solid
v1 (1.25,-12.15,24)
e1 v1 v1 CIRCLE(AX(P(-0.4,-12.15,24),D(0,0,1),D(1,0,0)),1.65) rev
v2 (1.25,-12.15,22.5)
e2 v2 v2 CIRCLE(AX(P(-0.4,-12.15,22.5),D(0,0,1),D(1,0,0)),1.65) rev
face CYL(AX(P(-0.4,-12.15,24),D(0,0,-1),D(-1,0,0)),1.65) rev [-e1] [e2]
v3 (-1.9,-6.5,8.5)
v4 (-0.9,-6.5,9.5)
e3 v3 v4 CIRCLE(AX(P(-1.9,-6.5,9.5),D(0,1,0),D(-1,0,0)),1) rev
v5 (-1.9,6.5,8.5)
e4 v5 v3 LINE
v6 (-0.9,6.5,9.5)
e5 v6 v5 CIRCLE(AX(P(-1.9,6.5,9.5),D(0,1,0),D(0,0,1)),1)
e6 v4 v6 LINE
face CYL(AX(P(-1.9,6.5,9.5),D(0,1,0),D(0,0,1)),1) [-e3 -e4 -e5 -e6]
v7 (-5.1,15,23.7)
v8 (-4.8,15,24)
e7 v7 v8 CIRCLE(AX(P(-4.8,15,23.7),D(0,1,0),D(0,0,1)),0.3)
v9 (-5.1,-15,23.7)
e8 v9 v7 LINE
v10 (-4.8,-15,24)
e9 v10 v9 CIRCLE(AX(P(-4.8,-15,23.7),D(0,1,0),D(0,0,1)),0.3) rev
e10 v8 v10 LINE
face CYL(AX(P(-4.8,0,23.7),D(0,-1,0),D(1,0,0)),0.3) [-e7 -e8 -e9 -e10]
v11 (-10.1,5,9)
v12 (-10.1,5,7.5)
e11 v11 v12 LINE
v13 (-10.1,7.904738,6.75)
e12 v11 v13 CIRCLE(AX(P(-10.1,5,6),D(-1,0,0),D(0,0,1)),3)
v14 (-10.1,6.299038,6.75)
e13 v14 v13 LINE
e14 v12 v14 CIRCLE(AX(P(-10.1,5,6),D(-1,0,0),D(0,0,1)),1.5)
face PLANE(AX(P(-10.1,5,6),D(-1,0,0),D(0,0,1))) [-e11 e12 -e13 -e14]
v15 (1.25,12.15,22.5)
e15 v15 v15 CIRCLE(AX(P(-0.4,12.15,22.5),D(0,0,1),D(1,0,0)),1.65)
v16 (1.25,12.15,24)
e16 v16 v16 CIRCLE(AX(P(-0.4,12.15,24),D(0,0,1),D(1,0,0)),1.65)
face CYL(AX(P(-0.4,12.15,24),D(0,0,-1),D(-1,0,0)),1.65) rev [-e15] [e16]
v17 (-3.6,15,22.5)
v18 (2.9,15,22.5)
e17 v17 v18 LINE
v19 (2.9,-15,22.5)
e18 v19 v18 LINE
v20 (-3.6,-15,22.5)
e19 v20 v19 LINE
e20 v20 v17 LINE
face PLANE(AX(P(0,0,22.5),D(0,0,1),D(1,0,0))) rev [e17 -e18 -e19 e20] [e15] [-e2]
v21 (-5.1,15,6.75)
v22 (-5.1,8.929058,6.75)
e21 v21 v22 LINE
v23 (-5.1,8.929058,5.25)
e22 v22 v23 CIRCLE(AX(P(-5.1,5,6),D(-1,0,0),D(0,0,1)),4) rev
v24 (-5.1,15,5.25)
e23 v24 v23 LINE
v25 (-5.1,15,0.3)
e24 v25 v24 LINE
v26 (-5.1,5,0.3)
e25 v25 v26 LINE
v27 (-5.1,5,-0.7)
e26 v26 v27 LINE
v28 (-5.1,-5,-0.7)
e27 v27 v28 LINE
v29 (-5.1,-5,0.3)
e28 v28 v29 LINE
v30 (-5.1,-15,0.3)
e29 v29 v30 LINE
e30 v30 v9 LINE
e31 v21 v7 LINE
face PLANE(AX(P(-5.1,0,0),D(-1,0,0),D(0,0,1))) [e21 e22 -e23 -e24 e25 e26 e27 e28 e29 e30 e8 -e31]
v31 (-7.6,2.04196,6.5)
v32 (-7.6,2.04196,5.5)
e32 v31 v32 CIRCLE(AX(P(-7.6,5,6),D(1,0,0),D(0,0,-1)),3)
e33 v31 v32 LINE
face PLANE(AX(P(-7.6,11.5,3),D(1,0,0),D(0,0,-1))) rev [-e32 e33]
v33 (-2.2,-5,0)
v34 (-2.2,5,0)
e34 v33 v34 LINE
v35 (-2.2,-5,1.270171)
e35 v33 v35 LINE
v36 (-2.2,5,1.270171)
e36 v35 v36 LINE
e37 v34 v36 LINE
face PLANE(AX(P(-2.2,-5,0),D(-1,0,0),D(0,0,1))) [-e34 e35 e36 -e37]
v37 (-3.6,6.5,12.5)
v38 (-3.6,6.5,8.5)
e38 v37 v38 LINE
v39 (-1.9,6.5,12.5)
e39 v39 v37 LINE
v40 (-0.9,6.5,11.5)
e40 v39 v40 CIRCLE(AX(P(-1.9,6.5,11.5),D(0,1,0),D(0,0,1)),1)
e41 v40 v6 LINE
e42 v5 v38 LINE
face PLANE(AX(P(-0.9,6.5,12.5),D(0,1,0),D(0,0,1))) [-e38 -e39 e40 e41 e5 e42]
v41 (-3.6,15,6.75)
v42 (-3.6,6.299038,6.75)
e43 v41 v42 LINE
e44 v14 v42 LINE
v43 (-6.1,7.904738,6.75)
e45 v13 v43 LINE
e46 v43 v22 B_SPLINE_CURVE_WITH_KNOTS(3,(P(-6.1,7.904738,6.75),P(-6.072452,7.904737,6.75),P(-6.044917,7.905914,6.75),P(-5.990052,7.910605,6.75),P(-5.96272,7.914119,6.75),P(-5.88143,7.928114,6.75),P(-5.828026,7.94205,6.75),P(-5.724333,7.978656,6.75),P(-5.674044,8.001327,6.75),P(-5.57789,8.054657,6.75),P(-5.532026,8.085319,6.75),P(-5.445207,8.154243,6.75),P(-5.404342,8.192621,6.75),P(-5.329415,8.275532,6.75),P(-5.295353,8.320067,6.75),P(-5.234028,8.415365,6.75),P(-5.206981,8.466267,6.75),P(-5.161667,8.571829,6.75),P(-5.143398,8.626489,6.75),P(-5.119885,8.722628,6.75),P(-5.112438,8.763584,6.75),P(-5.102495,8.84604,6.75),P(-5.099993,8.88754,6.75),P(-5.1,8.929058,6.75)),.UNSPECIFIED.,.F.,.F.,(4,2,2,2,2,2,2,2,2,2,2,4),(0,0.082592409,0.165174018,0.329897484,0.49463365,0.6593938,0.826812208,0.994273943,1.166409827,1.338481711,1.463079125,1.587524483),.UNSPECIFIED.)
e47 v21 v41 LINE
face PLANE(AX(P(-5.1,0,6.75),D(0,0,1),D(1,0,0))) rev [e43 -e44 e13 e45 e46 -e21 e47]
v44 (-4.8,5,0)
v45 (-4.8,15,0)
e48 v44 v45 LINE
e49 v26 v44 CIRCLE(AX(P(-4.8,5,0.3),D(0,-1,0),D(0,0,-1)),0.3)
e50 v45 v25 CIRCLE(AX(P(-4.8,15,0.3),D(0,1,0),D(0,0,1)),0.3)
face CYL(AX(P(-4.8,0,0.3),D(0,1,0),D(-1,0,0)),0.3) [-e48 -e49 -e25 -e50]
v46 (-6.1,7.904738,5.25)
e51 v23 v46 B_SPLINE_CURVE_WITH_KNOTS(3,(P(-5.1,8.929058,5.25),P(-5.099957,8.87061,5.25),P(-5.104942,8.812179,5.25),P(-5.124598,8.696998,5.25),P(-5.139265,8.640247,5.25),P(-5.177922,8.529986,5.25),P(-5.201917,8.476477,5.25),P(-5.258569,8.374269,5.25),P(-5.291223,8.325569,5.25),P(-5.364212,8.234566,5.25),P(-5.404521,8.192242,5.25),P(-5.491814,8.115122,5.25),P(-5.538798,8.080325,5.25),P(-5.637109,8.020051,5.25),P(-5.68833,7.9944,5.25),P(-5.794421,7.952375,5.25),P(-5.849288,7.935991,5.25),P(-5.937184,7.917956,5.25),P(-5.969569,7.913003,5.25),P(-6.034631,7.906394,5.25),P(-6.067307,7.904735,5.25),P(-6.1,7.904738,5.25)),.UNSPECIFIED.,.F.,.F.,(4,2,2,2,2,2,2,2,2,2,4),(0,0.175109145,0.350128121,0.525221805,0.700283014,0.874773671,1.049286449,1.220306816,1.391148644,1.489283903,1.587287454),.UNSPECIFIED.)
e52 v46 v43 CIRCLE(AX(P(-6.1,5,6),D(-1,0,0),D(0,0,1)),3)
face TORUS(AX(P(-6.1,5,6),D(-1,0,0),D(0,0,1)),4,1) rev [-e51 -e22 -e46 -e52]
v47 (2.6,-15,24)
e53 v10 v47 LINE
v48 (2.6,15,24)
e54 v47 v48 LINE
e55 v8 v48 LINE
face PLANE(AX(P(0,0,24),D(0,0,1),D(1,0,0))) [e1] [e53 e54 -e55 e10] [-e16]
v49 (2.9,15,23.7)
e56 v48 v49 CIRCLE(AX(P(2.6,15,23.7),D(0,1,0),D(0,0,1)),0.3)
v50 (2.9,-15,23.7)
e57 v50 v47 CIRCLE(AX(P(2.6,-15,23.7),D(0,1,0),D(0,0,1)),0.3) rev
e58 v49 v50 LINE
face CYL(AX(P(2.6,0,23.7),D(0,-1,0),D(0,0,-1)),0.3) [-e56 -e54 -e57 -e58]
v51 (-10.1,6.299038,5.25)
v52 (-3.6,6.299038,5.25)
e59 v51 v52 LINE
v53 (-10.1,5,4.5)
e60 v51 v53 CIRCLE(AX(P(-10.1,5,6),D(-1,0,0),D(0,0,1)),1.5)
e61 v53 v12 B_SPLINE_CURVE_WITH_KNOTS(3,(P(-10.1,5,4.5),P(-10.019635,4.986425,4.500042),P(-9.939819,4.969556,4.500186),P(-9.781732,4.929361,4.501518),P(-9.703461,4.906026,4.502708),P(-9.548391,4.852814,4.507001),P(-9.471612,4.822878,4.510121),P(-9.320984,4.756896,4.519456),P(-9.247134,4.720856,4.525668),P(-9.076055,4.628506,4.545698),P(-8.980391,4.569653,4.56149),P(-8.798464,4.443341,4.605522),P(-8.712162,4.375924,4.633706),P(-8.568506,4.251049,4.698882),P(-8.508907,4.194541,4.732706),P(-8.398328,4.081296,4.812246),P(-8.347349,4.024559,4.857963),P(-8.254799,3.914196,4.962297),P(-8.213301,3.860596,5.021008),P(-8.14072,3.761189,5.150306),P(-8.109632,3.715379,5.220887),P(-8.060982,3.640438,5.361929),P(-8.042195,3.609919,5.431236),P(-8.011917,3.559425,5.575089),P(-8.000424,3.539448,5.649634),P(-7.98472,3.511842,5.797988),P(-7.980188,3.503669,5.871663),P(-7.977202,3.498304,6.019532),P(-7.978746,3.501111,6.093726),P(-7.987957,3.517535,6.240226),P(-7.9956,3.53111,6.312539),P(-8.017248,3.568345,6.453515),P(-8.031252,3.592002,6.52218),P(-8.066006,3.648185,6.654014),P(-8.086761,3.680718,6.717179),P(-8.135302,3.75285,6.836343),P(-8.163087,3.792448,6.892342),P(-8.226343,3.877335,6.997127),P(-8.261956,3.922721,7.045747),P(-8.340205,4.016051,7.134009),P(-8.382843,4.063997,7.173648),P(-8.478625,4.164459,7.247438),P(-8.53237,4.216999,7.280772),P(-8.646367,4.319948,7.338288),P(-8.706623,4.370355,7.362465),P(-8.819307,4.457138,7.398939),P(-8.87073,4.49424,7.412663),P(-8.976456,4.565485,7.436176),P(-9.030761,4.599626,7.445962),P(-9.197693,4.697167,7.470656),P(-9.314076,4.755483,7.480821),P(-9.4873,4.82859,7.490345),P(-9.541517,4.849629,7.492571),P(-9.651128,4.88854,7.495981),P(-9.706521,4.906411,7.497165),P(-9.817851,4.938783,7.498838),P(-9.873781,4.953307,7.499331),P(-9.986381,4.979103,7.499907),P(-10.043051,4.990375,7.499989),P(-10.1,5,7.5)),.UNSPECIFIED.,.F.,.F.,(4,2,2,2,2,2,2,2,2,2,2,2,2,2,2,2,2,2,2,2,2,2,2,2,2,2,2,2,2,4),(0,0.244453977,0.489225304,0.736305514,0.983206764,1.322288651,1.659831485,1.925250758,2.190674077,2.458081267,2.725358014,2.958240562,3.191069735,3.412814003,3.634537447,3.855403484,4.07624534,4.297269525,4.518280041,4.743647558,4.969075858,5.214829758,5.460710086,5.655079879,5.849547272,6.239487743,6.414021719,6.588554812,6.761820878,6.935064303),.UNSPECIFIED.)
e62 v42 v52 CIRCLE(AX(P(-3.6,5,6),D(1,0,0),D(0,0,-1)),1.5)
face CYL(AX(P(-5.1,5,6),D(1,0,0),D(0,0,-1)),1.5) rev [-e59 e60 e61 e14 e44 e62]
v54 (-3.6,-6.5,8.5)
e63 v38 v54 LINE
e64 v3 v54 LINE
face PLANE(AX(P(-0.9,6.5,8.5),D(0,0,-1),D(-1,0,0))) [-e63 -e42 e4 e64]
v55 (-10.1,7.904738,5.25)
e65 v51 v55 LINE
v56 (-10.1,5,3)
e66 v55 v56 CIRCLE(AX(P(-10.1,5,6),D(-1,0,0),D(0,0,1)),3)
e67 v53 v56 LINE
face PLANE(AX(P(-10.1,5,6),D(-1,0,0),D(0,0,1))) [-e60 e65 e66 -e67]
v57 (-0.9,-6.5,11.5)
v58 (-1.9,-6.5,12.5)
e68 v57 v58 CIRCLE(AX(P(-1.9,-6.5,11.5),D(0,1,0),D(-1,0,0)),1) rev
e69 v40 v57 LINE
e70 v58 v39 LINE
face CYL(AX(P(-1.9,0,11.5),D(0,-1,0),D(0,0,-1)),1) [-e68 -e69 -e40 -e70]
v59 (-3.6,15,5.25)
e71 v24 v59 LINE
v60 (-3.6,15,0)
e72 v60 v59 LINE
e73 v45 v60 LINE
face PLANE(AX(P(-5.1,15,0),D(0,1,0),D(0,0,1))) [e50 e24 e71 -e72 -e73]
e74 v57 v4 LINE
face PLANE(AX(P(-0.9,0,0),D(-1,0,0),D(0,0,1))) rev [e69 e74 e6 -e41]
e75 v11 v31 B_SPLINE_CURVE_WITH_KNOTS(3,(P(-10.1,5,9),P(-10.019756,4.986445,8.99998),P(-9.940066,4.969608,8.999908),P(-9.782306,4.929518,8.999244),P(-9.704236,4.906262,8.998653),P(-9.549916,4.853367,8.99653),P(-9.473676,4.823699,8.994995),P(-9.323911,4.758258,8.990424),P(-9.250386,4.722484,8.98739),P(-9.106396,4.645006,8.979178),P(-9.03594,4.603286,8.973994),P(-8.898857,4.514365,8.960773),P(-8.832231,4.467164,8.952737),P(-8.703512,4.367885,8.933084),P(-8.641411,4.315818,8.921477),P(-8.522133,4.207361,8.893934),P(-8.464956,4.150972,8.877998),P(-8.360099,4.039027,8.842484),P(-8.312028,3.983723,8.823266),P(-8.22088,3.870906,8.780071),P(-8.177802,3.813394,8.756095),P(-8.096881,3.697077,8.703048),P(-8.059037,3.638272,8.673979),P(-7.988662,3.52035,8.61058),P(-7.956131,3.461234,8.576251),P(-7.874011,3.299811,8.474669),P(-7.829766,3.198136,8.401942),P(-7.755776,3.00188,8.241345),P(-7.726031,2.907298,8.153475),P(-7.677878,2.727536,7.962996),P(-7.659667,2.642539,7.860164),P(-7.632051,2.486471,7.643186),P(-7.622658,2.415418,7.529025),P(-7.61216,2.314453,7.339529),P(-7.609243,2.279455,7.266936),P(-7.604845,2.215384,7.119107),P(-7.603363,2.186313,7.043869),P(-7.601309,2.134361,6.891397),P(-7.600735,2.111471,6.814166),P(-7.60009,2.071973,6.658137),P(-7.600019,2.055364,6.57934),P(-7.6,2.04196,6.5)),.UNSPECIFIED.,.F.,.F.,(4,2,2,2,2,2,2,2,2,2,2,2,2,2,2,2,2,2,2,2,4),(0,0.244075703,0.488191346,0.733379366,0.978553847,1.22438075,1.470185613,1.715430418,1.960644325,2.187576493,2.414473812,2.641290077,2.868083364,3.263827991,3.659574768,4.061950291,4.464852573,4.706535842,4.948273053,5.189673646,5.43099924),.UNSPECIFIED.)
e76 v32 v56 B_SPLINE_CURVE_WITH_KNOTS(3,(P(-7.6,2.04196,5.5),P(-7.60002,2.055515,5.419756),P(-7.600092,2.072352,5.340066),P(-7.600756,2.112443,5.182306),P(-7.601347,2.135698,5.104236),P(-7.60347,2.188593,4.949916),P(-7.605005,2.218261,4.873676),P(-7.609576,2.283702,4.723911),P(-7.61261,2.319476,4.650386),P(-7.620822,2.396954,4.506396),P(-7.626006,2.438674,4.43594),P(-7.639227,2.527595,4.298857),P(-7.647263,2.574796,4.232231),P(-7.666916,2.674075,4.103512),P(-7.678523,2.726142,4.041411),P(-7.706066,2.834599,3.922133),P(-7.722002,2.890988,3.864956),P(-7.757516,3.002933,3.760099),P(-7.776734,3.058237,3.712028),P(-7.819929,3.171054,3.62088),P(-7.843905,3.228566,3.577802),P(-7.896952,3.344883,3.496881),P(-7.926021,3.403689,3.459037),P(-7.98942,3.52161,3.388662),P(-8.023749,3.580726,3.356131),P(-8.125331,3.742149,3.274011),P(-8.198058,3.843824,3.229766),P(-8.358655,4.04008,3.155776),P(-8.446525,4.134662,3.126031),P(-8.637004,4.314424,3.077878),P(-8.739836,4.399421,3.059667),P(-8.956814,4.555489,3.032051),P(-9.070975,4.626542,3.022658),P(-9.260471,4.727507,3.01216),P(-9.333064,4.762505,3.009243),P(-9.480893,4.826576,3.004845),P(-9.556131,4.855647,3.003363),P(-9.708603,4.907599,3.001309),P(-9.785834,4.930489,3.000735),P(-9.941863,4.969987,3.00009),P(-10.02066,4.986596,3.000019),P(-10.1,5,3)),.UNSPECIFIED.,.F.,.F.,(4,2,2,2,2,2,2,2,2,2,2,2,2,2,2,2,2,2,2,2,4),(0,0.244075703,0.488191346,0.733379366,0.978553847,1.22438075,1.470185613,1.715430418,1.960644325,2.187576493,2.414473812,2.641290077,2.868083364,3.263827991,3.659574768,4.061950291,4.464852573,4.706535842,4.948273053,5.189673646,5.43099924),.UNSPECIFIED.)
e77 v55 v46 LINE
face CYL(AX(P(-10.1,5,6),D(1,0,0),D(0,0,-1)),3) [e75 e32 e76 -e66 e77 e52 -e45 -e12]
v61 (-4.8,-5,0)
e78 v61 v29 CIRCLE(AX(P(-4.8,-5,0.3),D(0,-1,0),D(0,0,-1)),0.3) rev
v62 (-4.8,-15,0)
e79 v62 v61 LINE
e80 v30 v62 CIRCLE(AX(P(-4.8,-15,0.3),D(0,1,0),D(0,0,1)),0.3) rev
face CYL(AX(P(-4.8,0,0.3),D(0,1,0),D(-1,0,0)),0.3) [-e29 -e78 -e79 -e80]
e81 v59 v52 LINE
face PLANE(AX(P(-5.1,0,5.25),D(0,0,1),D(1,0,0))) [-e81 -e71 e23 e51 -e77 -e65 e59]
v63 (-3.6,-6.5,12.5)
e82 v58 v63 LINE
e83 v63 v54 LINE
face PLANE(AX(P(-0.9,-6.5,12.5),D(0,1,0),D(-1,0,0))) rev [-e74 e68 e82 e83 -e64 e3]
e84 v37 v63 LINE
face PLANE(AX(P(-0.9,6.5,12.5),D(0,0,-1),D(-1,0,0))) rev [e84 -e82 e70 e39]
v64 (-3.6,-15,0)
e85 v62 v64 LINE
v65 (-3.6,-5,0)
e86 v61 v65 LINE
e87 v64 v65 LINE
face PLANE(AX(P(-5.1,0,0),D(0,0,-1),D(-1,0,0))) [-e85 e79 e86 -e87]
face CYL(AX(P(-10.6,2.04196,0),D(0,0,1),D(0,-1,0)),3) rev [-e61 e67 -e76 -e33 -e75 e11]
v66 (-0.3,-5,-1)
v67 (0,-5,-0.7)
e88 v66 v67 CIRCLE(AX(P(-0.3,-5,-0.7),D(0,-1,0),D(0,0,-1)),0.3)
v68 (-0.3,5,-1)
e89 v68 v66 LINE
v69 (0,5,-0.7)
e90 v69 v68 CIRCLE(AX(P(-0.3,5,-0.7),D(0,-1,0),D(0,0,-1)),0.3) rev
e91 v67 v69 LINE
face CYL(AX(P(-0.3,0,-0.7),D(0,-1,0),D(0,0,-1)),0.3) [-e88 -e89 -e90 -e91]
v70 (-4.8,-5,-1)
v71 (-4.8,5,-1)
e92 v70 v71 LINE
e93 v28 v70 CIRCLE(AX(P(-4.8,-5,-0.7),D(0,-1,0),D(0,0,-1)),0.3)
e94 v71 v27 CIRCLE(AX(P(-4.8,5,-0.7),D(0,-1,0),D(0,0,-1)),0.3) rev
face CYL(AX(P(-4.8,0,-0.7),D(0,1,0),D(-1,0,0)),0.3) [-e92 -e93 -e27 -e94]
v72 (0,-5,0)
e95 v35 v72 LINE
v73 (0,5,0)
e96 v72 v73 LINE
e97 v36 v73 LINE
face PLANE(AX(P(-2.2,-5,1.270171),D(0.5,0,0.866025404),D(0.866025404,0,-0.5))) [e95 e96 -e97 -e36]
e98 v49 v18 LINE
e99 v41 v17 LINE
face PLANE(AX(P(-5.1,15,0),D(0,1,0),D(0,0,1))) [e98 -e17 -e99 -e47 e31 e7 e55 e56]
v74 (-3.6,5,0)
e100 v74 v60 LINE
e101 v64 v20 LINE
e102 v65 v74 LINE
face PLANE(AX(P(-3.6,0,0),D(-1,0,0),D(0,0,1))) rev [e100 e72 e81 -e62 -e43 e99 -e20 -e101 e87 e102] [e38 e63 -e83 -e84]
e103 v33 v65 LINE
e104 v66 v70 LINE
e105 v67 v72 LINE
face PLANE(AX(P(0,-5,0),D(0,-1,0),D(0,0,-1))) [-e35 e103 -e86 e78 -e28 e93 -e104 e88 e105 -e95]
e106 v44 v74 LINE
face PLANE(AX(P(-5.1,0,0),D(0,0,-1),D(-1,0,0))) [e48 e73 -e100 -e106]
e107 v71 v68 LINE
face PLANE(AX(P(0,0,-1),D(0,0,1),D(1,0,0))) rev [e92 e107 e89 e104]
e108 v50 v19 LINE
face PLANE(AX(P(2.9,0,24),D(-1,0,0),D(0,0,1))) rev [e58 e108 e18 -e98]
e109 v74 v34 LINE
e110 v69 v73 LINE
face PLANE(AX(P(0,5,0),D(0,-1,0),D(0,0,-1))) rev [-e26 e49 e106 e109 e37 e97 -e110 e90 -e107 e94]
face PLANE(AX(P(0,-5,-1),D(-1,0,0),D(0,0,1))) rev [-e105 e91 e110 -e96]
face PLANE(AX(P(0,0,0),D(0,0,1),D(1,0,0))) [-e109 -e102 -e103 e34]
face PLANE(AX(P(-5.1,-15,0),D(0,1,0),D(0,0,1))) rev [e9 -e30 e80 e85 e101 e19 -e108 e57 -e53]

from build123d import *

# Parameters (mm, degrees)
BOSS_EXTRUDE1_DEPTH      = 5
BOSS_EXTRUDE1_DEPTH_BACK = 5
SKETCH2_W                = 3.6
SKETCH2_H                = 10
BOSS_EXTRUDE2_DEPTH      = 1
SKETCH3_W                = 1
SKETCH3_H                = 10
BOSS_EXTRUDE3_DEPTH      = 1.5
SKETCH4_W                = 1.5
SKETCH4_H                = 30
SKETCH4_W_2              = 6.5
SKETCH4_R                = 1.65
BOSS_EXTRUDE4_DEPTH      = 1.5
FILLET1_R                = 0.3
SKETCH5_W                = 4
SKETCH5_H                = 13
BOSS_EXTRUDE5_DEPTH      = 2.7
CUT_EXTRUDE1_DEPTH       = 30.038767191
BOSS_EXTRUDE6_START      = -1.5
BOSS_EXTRUDE6_DEPTH      = 5
CUT_EXTRUDE2_START       = -3
SKETCH8_W                = 2.5
SKETCH8_H                = 6
CUT_EXTRUDE2_DEPTH       = 3
FILLET2_R                = 3
FILLET3_R                = 1
FILLET4_R                = 1


with BuildPart() as part:
    # Sketch1 → Boss-Extrude1 (new, two sides: drawn at the far end of the back side and taken through both)
    with BuildSketch(Plane(origin=(0, 0, 0), x_dir=(1, 0, 0), z_dir=(0, 1, 0)).offset(-BOSS_EXTRUDE1_DEPTH_BACK)):
        Polygon((0, 0), (-2.2, 0), (-2.2, -1.270170592), align=None)
    extrude(amount=BOSS_EXTRUDE1_DEPTH + BOSS_EXTRUDE1_DEPTH_BACK)

    # Sketch2 → Boss-Extrude2 (add)
    with BuildSketch(Plane(origin=(0, 0, 0), x_dir=(-1, 0, 0), z_dir=(0, 0, -1))):
        with Locations((1.8, 0)):
            Rectangle(SKETCH2_W, SKETCH2_H)
    extrude(amount=BOSS_EXTRUDE2_DEPTH)

    # Sketch3 → Boss-Extrude3 (add)
    with BuildSketch(Plane.ZY.offset(3.6)):
        Polygon((0, -5), (0, -15), (22.5, -15), (22.5, 15), (0, 15), (0, 5), align=None)
        with Locations((-0.5, 0)):
            Rectangle(SKETCH3_W, SKETCH3_H)
    extrude(amount=BOSS_EXTRUDE3_DEPTH)

    # Sketch4 → Boss-Extrude4 (add)
    # profile 1 of 2: a face of its own
    with BuildSketch(Plane.XY.offset(22.5)):
        with Locations((-4.35, 0)):
            Rectangle(SKETCH4_W, SKETCH4_H)
    # profile 2 of 2: a face of its own
    with BuildSketch(Plane.XY.offset(22.5)):
        with Locations((-0.35, 0)):
            Rectangle(SKETCH4_W_2, SKETCH4_H)
        with Locations((-0.4, -12.15)):
            Circle(SKETCH4_R, mode=Mode.SUBTRACT)
        with Locations((-0.4, 12.15)):
            Circle(SKETCH4_R, mode=Mode.SUBTRACT)
    extrude(amount=BOSS_EXTRUDE4_DEPTH)

    # Fillet1
    fillet1_edges = [part.edges().sort_by_distance(p)[0] for p in [
        (0, 0, -1),
        (-5.1, 10, 0),
        (-5.1, -10, 0),
        (-5.1, 0, -1),
        (2.9, 0, 24),
        (-5.1, 0, 24),
    ]]
    fillet(fillet1_edges, radius=FILLET1_R)

    # Sketch5 → Boss-Extrude5 (add)
    with BuildSketch(Plane(origin=(-3.6, 0, 0), x_dir=(0, 0, -1), z_dir=(1, 0, 0))):
        with Locations((-10.5, 0)):
            Rectangle(SKETCH5_W, SKETCH5_H)
    extrude(amount=BOSS_EXTRUDE5_DEPTH)

    # Sketch7 → Cut-Extrude1 (cut, through all)
    with BuildSketch(Plane(origin=(-3.6, 0, 0), x_dir=(0, 0, -1), z_dir=(1, 0, 0))):
        with BuildLine():
            Line((-5.25, 6.299038106), (-5.25, 15))
            Line((-5.25, 15), (-6.75, 15))
            Line((-6.75, 15), (-6.75, 6.299038106))
            ThreePointArc((-6.75, 6.299038106), (-6, 3.5), (-5.25, 6.299038106))
        make_face()
    extrude(amount=-CUT_EXTRUDE1_DEPTH, mode=Mode.SUBTRACT)

    # Sketch7<3> → Boss-Extrude6 (add)
    with BuildSketch(Plane(origin=(-3.6, 0, 0), x_dir=(0, 0, -1), z_dir=(1, 0, 0)).offset(BOSS_EXTRUDE6_START)):
        with BuildLine():
            Line((-6.75, 6.299038106), (-6.75, 7.90473751))
            ThreePointArc((-6.75, 7.90473751), (-7.837117307, 2.628291755), (-3, 5))
            ThreePointArc((-3, 5), (-3.628291755, 6.837117307), (-5.25, 7.90473751))
            Line((-5.25, 7.90473751), (-5.25, 6.299038106))
            ThreePointArc((-5.25, 6.299038106), (-4.700961894, 5.75), (-4.5, 5))
            ThreePointArc((-4.5, 5), (-6.75, 3.700961894), (-6.75, 6.299038106))
        make_face()
    extrude(amount=-BOSS_EXTRUDE6_DEPTH)

    # Sketch8 → Cut-Extrude2 (cut)
    with BuildSketch(Plane(origin=(0, 2, 0), x_dir=(-1, 0, 0), z_dir=(0, -1, 0)).offset(CUT_EXTRUDE2_START)):
        with Locations((8.85, -6)):
            Rectangle(SKETCH8_W, SKETCH8_H)
    extrude(amount=CUT_EXTRUDE2_DEPTH, mode=Mode.SUBTRACT)

    # Fillet2
    # the kernel refuses this fillet: 3 mm, written as the material it adds along each edge
    with BuildSketch(Plane(origin=(-7.6, 5, -4.395099729), x_dir=(-1, 0, 0), z_dir=(0, 0, 1))) as fillet2_piece_1_section:
        with BuildLine():
            CenterArc((3, 2.958039892), FILLET2_R, 180, 80.405931773)
            Line((0, 2.958039892), (0, 0))
            Line((0, 0), (2.5, 0))
        make_face()
    fillet2_piece_1 = extrude(amount=16.290199458, mode=Mode.PRIVATE)
    fillet2_piece_1 = fillet2_piece_1 & Plane(origin=(-7.6, 5, 6), x_dir=(0, 0.9682458365518564, 0.2499999999999917), z_dir=(1, 0, 0)) * Cylinder(3, 45, mode=Mode.PRIVATE)
    fillet2_piece_1 = fillet2_piece_1 - Plane(origin=(-7.6, 5, 6), x_dir=(0, 0.8660254037844379, -0.5000000000000012), z_dir=(1, 0, 0)) * Cylinder(1.5, 45, mode=Mode.PRIVATE)
    add(fillet2_piece_1)

    # Fillet3
    fillet3_edges = [part.edges().sort_by_distance(p)[0] for p in [
        (-5.1, 2.628291755, 7.837117307),
    ]]
    fillet(fillet3_edges, radius=FILLET3_R)

    # Fillet4
    fillet4_edges = [part.edges().sort_by_distance(p)[0] for p in [
        (-0.9, 0, 8.5),
        (-0.9, 0, 12.5),
    ]]
    fillet(fillet4_edges, radius=FILLET4_R)


solid = part.part
